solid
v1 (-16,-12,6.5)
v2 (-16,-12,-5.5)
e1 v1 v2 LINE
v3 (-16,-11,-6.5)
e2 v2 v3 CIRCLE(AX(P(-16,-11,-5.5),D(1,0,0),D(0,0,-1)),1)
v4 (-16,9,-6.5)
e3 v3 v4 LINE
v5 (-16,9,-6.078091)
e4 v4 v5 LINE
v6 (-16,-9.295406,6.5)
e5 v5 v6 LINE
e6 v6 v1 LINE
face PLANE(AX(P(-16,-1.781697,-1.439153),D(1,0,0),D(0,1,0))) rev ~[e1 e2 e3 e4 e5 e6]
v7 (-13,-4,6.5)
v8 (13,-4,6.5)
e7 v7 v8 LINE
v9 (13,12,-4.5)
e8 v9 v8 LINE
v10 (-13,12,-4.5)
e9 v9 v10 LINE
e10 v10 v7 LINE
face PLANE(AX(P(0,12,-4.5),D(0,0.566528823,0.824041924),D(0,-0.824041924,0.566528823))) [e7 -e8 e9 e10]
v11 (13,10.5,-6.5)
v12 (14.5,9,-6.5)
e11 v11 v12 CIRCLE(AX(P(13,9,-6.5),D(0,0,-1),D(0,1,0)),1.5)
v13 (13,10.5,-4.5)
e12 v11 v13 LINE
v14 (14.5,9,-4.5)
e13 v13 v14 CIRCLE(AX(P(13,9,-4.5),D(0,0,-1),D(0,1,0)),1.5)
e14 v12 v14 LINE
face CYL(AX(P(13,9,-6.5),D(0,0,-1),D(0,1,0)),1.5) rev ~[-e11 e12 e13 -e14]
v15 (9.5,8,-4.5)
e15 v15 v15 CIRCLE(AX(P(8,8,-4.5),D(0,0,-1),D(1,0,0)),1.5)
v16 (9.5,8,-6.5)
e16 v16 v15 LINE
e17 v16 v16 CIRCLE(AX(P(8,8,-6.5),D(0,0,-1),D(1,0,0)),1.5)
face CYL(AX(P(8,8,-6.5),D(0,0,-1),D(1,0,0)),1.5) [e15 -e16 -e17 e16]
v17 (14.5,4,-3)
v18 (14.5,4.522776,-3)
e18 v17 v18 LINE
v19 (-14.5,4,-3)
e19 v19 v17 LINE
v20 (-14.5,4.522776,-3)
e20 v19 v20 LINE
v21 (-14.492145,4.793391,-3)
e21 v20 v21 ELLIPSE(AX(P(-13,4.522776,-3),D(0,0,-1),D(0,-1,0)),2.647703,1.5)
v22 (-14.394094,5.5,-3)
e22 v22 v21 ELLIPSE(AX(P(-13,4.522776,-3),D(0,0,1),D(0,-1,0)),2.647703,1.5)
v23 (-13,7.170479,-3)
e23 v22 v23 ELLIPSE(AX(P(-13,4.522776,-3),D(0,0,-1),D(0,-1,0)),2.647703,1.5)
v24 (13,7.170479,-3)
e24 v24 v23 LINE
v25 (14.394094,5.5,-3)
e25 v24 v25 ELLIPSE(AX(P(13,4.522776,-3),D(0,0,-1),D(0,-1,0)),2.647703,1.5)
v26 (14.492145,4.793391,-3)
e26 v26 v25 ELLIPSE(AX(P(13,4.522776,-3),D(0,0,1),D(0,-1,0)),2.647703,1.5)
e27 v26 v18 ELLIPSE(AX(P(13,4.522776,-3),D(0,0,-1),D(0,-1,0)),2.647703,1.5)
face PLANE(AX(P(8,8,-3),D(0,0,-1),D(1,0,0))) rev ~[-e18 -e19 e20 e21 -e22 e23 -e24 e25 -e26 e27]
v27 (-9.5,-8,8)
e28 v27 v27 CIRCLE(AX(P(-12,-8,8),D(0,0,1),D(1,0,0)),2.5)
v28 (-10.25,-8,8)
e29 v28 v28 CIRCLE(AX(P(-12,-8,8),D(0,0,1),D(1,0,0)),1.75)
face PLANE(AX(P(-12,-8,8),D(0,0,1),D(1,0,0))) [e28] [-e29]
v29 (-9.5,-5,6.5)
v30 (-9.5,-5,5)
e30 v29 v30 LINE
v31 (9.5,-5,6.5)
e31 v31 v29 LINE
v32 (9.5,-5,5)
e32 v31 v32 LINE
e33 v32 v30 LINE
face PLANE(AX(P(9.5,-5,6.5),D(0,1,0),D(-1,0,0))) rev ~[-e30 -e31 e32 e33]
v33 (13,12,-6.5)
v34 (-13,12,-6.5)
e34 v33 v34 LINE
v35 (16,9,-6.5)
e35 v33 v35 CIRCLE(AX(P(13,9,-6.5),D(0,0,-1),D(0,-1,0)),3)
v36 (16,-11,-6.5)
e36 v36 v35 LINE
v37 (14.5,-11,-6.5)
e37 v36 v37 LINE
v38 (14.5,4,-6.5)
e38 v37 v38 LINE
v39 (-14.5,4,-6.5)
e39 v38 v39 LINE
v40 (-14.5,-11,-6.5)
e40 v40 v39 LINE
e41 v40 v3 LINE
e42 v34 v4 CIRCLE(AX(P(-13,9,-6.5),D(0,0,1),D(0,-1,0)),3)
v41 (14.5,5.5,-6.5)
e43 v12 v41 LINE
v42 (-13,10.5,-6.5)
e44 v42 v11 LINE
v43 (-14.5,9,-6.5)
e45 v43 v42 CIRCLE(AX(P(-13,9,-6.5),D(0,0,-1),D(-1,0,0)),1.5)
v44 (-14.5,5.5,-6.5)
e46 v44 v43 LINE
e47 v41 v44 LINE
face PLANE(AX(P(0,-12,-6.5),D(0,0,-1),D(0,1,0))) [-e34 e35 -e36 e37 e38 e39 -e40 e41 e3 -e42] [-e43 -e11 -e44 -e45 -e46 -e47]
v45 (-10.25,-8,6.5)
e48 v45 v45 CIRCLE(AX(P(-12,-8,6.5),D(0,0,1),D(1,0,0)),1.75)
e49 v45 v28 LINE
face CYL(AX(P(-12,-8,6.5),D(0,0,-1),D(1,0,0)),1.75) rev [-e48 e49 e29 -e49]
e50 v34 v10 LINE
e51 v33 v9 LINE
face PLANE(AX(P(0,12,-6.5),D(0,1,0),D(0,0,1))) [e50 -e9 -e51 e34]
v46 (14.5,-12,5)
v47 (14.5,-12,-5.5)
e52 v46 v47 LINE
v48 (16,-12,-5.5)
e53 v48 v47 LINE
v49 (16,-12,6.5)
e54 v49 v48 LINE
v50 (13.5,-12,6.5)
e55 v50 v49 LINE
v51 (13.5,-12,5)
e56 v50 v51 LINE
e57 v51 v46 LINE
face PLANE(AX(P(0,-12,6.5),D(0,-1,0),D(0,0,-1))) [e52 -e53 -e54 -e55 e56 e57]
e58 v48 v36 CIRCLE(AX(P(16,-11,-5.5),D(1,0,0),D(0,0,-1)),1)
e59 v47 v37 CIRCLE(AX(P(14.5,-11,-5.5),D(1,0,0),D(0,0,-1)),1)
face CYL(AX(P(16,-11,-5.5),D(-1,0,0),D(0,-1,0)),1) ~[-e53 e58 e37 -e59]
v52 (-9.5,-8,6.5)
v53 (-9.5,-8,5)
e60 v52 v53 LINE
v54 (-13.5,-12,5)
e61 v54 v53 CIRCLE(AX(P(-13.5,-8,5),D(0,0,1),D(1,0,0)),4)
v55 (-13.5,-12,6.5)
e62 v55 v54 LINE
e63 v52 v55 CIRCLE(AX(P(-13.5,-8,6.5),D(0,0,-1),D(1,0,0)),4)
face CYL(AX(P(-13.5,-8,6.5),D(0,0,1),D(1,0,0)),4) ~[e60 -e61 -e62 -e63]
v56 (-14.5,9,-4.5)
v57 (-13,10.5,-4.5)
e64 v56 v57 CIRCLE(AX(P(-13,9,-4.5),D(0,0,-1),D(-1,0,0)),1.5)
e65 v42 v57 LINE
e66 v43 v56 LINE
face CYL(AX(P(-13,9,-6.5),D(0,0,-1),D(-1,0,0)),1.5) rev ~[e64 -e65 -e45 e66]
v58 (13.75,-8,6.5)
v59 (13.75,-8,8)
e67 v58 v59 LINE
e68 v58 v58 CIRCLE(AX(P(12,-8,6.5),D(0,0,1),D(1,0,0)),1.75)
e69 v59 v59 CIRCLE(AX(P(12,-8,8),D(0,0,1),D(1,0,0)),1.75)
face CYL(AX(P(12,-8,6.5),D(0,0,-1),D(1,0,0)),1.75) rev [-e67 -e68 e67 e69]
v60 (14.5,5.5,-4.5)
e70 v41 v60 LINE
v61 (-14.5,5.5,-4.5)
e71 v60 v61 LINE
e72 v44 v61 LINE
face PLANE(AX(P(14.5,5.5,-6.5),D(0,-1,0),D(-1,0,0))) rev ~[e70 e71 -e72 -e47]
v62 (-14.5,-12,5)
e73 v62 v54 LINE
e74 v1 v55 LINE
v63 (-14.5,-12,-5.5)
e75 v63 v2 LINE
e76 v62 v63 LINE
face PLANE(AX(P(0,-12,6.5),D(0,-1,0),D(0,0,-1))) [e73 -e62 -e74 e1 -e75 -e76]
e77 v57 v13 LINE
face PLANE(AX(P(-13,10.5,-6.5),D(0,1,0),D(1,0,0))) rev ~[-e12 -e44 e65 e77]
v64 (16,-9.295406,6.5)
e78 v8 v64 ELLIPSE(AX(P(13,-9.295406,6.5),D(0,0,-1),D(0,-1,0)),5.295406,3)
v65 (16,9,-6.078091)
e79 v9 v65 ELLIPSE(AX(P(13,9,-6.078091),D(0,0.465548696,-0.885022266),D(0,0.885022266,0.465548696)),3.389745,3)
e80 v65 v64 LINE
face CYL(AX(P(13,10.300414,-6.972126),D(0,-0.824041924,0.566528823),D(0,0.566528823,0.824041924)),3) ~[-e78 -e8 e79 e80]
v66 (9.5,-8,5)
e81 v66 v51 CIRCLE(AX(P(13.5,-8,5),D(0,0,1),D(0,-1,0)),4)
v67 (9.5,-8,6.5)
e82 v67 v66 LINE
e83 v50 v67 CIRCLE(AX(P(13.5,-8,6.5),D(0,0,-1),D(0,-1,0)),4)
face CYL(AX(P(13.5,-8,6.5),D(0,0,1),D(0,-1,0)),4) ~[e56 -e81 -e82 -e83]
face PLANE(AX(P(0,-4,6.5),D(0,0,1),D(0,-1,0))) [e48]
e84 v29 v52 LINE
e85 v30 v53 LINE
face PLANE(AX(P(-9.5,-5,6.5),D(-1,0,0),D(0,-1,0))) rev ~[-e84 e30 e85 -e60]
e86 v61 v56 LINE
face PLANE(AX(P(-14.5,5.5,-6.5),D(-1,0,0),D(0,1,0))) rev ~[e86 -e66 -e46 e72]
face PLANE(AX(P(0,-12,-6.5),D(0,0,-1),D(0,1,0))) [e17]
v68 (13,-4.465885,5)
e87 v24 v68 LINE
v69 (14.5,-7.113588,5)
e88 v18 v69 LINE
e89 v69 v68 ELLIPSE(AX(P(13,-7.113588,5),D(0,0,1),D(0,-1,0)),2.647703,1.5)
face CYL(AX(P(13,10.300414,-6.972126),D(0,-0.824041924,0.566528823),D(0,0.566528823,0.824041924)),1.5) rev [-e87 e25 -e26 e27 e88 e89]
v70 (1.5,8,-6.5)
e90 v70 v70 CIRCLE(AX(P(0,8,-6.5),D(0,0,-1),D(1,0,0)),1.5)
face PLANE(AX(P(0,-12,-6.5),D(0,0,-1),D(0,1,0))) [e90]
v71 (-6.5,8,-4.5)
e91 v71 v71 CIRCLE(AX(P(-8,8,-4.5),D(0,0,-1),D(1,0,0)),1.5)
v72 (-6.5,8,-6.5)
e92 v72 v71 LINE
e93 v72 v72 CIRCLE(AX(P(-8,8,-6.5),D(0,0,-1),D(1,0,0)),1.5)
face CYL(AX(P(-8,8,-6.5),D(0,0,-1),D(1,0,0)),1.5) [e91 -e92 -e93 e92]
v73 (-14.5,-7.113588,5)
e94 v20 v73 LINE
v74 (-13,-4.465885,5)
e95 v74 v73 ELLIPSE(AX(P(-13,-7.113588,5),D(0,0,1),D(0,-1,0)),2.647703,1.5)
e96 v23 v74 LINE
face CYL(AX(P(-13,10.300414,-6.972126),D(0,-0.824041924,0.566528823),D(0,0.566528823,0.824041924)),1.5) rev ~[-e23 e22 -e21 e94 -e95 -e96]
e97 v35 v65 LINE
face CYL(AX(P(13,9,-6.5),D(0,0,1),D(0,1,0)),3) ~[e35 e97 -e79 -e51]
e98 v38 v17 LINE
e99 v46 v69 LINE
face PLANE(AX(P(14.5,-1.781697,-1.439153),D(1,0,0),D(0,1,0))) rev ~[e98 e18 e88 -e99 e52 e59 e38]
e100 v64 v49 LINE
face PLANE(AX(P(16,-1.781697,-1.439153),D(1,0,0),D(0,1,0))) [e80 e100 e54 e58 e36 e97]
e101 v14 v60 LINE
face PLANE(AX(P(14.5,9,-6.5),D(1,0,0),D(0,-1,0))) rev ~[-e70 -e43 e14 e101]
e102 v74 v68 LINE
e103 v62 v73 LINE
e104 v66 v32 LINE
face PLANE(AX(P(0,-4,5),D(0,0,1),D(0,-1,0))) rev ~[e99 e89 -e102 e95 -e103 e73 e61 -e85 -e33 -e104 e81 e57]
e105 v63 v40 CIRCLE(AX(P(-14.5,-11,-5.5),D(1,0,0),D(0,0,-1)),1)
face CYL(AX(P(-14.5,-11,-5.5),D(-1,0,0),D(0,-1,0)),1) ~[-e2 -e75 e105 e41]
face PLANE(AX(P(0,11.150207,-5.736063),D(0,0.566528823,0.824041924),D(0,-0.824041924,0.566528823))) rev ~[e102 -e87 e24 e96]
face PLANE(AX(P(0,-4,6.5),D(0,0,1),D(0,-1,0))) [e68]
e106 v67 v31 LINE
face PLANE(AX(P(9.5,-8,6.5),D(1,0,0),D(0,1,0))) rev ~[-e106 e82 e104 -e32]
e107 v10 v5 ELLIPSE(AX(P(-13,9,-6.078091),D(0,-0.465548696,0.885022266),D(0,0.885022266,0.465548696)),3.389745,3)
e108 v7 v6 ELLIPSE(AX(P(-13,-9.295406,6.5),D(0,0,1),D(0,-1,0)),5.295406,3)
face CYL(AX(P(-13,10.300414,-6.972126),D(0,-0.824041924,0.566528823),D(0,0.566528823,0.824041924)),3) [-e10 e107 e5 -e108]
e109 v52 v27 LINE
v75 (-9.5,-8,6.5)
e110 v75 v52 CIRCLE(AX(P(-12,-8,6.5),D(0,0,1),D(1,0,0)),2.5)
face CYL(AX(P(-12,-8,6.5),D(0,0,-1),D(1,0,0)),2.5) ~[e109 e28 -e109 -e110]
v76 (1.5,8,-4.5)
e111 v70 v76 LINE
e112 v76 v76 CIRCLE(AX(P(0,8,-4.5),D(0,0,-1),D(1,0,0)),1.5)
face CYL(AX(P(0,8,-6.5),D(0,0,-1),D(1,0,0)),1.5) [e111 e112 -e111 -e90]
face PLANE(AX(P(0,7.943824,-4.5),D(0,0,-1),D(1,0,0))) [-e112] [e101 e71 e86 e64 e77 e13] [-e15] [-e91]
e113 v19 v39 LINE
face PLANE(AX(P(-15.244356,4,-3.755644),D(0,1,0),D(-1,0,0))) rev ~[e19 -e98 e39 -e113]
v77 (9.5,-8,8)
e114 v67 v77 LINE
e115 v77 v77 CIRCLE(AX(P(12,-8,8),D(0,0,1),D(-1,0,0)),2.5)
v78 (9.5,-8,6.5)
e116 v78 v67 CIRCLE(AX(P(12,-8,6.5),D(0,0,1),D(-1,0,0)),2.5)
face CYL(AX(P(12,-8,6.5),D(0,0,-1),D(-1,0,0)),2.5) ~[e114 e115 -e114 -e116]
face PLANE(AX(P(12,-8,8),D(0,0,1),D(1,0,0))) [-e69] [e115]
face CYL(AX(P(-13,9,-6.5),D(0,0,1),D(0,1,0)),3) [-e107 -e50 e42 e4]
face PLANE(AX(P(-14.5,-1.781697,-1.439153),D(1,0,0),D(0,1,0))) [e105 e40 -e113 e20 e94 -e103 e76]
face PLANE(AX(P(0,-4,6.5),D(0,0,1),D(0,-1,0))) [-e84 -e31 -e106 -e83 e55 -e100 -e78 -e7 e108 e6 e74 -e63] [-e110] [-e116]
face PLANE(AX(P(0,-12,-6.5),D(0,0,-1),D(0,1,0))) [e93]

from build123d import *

# Parameters (mm, degrees)
F1_DEPTH     = 16
F2_R         = 3
F3_R         = 1.5
F4_DEPTH     = 2
F5_T         = 1.5
F5_T3_DEPTH  = 5
F5_T5_DEPTH  = 6.5
F5_T7_DEPTH  = 32
F5_T9_DEPTH  = 29
F5_T12_ANGLE = 90.000000001
F5_T14_ANGLE = 90.000000001
F7_DEPTH     = 13.001
F6_R         = 2.5
F6_R_2       = 1.75
F8_DEPTH     = 1.5
F9_R         = 1


# Not quite as in the source:
# - a shell that OpenCascade refuses in one call is made with other operations: the cavity is built on its own and cut out


with BuildPart() as f1:
    # F0 (on Right) → F1 (new body, symmetric)
    with BuildSketch(Plane.YZ):
        Polygon((12, -4.5), (-4, 6.5), (-12, 6.5), (-12, -6.5), (12, -6.5), align=None)
    extrude(amount=F1_DEPTH, both=True)

    # F2
    f2_edges = [f1.edges().sort_by_distance(p)[0] for p in [
        (16, 12, -5.5),
        (-16, 12, -5.5),
        (16, 4, 1),
        (-16, 4, 1),
    ]]
    fillet(f2_edges, radius=F2_R)

    # F3 (on face) → F4 (cut)
    with BuildSketch(Plane(origin=(0, 0, -6.5), x_dir=(1, 0, 0), z_dir=(0, 0, -1))):
        with BuildLine():
            ThreePointArc((13, -10.5), (14.0606601718, -10.0606601718), (14.5, -9))
            Line((14.5, -9), (14.5, -5.5))
            Line((14.5, -5.5), (-14.5, -5.5))
            Line((-14.5, -5.5), (-14.5, -9))
            ThreePointArc((-14.5, -9), (-14.0606601718, -10.0606601718), (-13, -10.5))
            Line((-13, -10.5), (13, -10.5))
        make_face()
        with Locations((-8, -8)):
            Circle(F3_R, mode=Mode.SUBTRACT)
        with Locations((0, -8)):
            Circle(F3_R, mode=Mode.SUBTRACT)
        with Locations((8, -8)):
            Circle(F3_R, mode=Mode.SUBTRACT)
    extrude(amount=-F4_DEPTH, mode=Mode.SUBTRACT)

    # F5: shell of thickness 1.5, made by hand


with BuildPart() as f5_core1:
    # F5_t2: copy of F1
    add(f1.part)

    # the walls: a layer under each face that stays
    f5_faces = [f5_core1.faces().sort_by_distance(p)[0] for p in [
        (0, 4, 1),
        (0, -8, 6.5),
        (-15.1213203436, 1.7042929957, 1.5119940115),
        (15.1213203436, 1.7042929957, 1.5119940115),
        (0, 12, -5.5),
        (-16, -1.5, 0),
        (16, -1.5, 0),
        (-15.1213203436, 11.1213203436, -5.5),
        (15.1213203436, 11.1213203436, -5.5),
        (14.0606601718, 10.0606601718, -5.5),
        (14.5, 7.25, -5.5),
        (0, 5.5, -5.5),
        (-14.5, 7.25, -5.5),
        (-14.0606601718, 10.0606601718, -5.5),
        (0, 10.5, -5.5),
        (-9.6666666667, 9.6666666667, -4.5),
        (-8, 8, -6.5),
        (0, 8, -6.5),
        (8, 8, -6.5),
    ]]
    thicken(f5_faces, amount=-F5_T, mode=Mode.SUBTRACT)

    # F5_s4 → F5_t3 (cut)
    with BuildSketch(Plane.XY.offset(-8)):
        Polygon((14.485, 5.515), (16, 5.5), (16, 4), (14.5, 4), align=None)
        Polygon((-14.485, 5.515), (-14.5, 4), (-16, 4), (-16, 5.5), align=None)
    extrude(amount=F5_T3_DEPTH, mode=Mode.SUBTRACT)

    # F5_s6 → F5_t5 (cut)
    with BuildSketch(Plane.XZ.offset(-10.5)):
        Polygon((14.485, -4.515), (16, -4.5), (16, -3), (14.5, -3), align=None)
        Polygon((-14.485, -4.515), (-16, -4.5), (-16, -3), (-14.5, -3), align=None)
    extrude(amount=F5_T5_DEPTH, mode=Mode.SUBTRACT)

    # F5_s8 → F5_t7 (cut)
    with BuildSketch(Plane.YZ.offset(-16)):
        Polygon((5.515, -4.515), (4, -4.5), (4, -3), (5.5, -3), align=None)
    extrude(amount=F5_T7_DEPTH, mode=Mode.SUBTRACT)

    # F5_s10 → F5_t9 (cut)
    with BuildSketch(Plane.YZ.offset(-14.5)):
        Polygon((10.485, -4.515), (12, -4.5), (12, -3), (10.5, -3), align=None)
    extrude(amount=F5_T9_DEPTH, mode=Mode.SUBTRACT)

    # F5_s11 → F5_t12 (revolve, cut)
    with BuildSketch(Plane.YZ.offset(13)):
        Polygon((10.485, -4.515), (12, -4.5), (12, -3), (10.5, -3), align=None)
    revolve(axis=Axis((13, 9, -4.5), (0, 0, -1)), revolution_arc=F5_T12_ANGLE, mode=Mode.SUBTRACT)

    # F5_s13 → F5_t14 (revolve, cut)
    with BuildSketch(Plane.XZ.offset(-9)):
        Polygon((-14.485, -4.515), (-16, -4.5), (-16, -3), (-14.5, -3), align=None)
    revolve(axis=Axis((-13, 9, -4.5), (0, 0, -1)), revolution_arc=F5_T14_ANGLE, mode=Mode.SUBTRACT)

    # F5_s15 → F5_t16 (revolve, cut)
    with BuildSketch(Plane.XZ.offset(-8)):
        Polygon((-6.485, -4.515), (-6.5, -3), (-8, -3), (-8, -4.5), align=None)
    revolve(axis=Axis((-8, 8, -4.5), (0, 0, -1)), mode=Mode.SUBTRACT)

    # F5_s17 → F5_t18 (revolve, cut)
    with BuildSketch(Plane.XZ.offset(-8)):
        Polygon((1.515, -4.515), (1.5, -3), (0, -3), (0, -4.5), align=None)
    revolve(axis=Axis((0, 8, -4.5), (0, 0, -1)), mode=Mode.SUBTRACT)

    # F5_s19 → F5_t20 (revolve, cut)
    with BuildSketch(Plane.XZ.offset(-8)):
        Polygon((9.515, -4.515), (9.5, -3), (8, -3), (8, -4.5), align=None)
    revolve(axis=Axis((8, 8, -4.5), (0, 0, -1)), mode=Mode.SUBTRACT)


with BuildPart() as f1_1:
    add(f1.part)

    # what is left inside the walls is the cavity
    f5_cavity = [f5_core1.part.solids().sort_by_distance(p)[0] for p in [
        (-4.833333, -4, -6.485),
    ]]
    add(f5_cavity, mode=Mode.SUBTRACT)

    # F6 (on face) → F7 (cut, through all)
    with BuildSketch(Plane.XY.offset(6.5)):
        with BuildLine():
            Line((9.5, -5), (-9.5, -5))
            Line((-9.5, -5), (-9.5, -8))
            ThreePointArc((-9.5, -8), (-10.6715728753, -10.8284271247), (-13.5, -12))
            Line((-13.5, -12), (13.5, -12))
            ThreePointArc((13.5, -12), (10.6715728753, -10.8284271247), (9.5, -8))
            Line((9.5, -8), (9.5, -5))
        make_face()
    extrude(amount=-F7_DEPTH, mode=Mode.SUBTRACT)

    # F6 (on face) → F8 (join)
    with BuildSketch(Plane.XY.offset(6.5)):
        with Locations((-12, -8)):
            Circle(F6_R)
        with Locations((-12, -8)):
            Circle(F6_R_2, mode=Mode.SUBTRACT)
        with BuildLine():
            ThreePointArc((14.5, -8), (12, -5.5), (9.5, -8))
            ThreePointArc((9.5, -8), (12, -10.5), (14.5, -8))
        make_face()
        with Locations((12, -8)):
            Circle(F6_R_2, mode=Mode.SUBTRACT)
    extrude(amount=F8_DEPTH)

    # F9
    f9_edges = [f1_1.edges().sort_by_distance(p)[0] for p in [
        (15.25, -12, -6.5),
        (-15.25, -12, -6.5),
    ]]
    fillet(f9_edges, radius=F9_R)


solid = f1_1.part
